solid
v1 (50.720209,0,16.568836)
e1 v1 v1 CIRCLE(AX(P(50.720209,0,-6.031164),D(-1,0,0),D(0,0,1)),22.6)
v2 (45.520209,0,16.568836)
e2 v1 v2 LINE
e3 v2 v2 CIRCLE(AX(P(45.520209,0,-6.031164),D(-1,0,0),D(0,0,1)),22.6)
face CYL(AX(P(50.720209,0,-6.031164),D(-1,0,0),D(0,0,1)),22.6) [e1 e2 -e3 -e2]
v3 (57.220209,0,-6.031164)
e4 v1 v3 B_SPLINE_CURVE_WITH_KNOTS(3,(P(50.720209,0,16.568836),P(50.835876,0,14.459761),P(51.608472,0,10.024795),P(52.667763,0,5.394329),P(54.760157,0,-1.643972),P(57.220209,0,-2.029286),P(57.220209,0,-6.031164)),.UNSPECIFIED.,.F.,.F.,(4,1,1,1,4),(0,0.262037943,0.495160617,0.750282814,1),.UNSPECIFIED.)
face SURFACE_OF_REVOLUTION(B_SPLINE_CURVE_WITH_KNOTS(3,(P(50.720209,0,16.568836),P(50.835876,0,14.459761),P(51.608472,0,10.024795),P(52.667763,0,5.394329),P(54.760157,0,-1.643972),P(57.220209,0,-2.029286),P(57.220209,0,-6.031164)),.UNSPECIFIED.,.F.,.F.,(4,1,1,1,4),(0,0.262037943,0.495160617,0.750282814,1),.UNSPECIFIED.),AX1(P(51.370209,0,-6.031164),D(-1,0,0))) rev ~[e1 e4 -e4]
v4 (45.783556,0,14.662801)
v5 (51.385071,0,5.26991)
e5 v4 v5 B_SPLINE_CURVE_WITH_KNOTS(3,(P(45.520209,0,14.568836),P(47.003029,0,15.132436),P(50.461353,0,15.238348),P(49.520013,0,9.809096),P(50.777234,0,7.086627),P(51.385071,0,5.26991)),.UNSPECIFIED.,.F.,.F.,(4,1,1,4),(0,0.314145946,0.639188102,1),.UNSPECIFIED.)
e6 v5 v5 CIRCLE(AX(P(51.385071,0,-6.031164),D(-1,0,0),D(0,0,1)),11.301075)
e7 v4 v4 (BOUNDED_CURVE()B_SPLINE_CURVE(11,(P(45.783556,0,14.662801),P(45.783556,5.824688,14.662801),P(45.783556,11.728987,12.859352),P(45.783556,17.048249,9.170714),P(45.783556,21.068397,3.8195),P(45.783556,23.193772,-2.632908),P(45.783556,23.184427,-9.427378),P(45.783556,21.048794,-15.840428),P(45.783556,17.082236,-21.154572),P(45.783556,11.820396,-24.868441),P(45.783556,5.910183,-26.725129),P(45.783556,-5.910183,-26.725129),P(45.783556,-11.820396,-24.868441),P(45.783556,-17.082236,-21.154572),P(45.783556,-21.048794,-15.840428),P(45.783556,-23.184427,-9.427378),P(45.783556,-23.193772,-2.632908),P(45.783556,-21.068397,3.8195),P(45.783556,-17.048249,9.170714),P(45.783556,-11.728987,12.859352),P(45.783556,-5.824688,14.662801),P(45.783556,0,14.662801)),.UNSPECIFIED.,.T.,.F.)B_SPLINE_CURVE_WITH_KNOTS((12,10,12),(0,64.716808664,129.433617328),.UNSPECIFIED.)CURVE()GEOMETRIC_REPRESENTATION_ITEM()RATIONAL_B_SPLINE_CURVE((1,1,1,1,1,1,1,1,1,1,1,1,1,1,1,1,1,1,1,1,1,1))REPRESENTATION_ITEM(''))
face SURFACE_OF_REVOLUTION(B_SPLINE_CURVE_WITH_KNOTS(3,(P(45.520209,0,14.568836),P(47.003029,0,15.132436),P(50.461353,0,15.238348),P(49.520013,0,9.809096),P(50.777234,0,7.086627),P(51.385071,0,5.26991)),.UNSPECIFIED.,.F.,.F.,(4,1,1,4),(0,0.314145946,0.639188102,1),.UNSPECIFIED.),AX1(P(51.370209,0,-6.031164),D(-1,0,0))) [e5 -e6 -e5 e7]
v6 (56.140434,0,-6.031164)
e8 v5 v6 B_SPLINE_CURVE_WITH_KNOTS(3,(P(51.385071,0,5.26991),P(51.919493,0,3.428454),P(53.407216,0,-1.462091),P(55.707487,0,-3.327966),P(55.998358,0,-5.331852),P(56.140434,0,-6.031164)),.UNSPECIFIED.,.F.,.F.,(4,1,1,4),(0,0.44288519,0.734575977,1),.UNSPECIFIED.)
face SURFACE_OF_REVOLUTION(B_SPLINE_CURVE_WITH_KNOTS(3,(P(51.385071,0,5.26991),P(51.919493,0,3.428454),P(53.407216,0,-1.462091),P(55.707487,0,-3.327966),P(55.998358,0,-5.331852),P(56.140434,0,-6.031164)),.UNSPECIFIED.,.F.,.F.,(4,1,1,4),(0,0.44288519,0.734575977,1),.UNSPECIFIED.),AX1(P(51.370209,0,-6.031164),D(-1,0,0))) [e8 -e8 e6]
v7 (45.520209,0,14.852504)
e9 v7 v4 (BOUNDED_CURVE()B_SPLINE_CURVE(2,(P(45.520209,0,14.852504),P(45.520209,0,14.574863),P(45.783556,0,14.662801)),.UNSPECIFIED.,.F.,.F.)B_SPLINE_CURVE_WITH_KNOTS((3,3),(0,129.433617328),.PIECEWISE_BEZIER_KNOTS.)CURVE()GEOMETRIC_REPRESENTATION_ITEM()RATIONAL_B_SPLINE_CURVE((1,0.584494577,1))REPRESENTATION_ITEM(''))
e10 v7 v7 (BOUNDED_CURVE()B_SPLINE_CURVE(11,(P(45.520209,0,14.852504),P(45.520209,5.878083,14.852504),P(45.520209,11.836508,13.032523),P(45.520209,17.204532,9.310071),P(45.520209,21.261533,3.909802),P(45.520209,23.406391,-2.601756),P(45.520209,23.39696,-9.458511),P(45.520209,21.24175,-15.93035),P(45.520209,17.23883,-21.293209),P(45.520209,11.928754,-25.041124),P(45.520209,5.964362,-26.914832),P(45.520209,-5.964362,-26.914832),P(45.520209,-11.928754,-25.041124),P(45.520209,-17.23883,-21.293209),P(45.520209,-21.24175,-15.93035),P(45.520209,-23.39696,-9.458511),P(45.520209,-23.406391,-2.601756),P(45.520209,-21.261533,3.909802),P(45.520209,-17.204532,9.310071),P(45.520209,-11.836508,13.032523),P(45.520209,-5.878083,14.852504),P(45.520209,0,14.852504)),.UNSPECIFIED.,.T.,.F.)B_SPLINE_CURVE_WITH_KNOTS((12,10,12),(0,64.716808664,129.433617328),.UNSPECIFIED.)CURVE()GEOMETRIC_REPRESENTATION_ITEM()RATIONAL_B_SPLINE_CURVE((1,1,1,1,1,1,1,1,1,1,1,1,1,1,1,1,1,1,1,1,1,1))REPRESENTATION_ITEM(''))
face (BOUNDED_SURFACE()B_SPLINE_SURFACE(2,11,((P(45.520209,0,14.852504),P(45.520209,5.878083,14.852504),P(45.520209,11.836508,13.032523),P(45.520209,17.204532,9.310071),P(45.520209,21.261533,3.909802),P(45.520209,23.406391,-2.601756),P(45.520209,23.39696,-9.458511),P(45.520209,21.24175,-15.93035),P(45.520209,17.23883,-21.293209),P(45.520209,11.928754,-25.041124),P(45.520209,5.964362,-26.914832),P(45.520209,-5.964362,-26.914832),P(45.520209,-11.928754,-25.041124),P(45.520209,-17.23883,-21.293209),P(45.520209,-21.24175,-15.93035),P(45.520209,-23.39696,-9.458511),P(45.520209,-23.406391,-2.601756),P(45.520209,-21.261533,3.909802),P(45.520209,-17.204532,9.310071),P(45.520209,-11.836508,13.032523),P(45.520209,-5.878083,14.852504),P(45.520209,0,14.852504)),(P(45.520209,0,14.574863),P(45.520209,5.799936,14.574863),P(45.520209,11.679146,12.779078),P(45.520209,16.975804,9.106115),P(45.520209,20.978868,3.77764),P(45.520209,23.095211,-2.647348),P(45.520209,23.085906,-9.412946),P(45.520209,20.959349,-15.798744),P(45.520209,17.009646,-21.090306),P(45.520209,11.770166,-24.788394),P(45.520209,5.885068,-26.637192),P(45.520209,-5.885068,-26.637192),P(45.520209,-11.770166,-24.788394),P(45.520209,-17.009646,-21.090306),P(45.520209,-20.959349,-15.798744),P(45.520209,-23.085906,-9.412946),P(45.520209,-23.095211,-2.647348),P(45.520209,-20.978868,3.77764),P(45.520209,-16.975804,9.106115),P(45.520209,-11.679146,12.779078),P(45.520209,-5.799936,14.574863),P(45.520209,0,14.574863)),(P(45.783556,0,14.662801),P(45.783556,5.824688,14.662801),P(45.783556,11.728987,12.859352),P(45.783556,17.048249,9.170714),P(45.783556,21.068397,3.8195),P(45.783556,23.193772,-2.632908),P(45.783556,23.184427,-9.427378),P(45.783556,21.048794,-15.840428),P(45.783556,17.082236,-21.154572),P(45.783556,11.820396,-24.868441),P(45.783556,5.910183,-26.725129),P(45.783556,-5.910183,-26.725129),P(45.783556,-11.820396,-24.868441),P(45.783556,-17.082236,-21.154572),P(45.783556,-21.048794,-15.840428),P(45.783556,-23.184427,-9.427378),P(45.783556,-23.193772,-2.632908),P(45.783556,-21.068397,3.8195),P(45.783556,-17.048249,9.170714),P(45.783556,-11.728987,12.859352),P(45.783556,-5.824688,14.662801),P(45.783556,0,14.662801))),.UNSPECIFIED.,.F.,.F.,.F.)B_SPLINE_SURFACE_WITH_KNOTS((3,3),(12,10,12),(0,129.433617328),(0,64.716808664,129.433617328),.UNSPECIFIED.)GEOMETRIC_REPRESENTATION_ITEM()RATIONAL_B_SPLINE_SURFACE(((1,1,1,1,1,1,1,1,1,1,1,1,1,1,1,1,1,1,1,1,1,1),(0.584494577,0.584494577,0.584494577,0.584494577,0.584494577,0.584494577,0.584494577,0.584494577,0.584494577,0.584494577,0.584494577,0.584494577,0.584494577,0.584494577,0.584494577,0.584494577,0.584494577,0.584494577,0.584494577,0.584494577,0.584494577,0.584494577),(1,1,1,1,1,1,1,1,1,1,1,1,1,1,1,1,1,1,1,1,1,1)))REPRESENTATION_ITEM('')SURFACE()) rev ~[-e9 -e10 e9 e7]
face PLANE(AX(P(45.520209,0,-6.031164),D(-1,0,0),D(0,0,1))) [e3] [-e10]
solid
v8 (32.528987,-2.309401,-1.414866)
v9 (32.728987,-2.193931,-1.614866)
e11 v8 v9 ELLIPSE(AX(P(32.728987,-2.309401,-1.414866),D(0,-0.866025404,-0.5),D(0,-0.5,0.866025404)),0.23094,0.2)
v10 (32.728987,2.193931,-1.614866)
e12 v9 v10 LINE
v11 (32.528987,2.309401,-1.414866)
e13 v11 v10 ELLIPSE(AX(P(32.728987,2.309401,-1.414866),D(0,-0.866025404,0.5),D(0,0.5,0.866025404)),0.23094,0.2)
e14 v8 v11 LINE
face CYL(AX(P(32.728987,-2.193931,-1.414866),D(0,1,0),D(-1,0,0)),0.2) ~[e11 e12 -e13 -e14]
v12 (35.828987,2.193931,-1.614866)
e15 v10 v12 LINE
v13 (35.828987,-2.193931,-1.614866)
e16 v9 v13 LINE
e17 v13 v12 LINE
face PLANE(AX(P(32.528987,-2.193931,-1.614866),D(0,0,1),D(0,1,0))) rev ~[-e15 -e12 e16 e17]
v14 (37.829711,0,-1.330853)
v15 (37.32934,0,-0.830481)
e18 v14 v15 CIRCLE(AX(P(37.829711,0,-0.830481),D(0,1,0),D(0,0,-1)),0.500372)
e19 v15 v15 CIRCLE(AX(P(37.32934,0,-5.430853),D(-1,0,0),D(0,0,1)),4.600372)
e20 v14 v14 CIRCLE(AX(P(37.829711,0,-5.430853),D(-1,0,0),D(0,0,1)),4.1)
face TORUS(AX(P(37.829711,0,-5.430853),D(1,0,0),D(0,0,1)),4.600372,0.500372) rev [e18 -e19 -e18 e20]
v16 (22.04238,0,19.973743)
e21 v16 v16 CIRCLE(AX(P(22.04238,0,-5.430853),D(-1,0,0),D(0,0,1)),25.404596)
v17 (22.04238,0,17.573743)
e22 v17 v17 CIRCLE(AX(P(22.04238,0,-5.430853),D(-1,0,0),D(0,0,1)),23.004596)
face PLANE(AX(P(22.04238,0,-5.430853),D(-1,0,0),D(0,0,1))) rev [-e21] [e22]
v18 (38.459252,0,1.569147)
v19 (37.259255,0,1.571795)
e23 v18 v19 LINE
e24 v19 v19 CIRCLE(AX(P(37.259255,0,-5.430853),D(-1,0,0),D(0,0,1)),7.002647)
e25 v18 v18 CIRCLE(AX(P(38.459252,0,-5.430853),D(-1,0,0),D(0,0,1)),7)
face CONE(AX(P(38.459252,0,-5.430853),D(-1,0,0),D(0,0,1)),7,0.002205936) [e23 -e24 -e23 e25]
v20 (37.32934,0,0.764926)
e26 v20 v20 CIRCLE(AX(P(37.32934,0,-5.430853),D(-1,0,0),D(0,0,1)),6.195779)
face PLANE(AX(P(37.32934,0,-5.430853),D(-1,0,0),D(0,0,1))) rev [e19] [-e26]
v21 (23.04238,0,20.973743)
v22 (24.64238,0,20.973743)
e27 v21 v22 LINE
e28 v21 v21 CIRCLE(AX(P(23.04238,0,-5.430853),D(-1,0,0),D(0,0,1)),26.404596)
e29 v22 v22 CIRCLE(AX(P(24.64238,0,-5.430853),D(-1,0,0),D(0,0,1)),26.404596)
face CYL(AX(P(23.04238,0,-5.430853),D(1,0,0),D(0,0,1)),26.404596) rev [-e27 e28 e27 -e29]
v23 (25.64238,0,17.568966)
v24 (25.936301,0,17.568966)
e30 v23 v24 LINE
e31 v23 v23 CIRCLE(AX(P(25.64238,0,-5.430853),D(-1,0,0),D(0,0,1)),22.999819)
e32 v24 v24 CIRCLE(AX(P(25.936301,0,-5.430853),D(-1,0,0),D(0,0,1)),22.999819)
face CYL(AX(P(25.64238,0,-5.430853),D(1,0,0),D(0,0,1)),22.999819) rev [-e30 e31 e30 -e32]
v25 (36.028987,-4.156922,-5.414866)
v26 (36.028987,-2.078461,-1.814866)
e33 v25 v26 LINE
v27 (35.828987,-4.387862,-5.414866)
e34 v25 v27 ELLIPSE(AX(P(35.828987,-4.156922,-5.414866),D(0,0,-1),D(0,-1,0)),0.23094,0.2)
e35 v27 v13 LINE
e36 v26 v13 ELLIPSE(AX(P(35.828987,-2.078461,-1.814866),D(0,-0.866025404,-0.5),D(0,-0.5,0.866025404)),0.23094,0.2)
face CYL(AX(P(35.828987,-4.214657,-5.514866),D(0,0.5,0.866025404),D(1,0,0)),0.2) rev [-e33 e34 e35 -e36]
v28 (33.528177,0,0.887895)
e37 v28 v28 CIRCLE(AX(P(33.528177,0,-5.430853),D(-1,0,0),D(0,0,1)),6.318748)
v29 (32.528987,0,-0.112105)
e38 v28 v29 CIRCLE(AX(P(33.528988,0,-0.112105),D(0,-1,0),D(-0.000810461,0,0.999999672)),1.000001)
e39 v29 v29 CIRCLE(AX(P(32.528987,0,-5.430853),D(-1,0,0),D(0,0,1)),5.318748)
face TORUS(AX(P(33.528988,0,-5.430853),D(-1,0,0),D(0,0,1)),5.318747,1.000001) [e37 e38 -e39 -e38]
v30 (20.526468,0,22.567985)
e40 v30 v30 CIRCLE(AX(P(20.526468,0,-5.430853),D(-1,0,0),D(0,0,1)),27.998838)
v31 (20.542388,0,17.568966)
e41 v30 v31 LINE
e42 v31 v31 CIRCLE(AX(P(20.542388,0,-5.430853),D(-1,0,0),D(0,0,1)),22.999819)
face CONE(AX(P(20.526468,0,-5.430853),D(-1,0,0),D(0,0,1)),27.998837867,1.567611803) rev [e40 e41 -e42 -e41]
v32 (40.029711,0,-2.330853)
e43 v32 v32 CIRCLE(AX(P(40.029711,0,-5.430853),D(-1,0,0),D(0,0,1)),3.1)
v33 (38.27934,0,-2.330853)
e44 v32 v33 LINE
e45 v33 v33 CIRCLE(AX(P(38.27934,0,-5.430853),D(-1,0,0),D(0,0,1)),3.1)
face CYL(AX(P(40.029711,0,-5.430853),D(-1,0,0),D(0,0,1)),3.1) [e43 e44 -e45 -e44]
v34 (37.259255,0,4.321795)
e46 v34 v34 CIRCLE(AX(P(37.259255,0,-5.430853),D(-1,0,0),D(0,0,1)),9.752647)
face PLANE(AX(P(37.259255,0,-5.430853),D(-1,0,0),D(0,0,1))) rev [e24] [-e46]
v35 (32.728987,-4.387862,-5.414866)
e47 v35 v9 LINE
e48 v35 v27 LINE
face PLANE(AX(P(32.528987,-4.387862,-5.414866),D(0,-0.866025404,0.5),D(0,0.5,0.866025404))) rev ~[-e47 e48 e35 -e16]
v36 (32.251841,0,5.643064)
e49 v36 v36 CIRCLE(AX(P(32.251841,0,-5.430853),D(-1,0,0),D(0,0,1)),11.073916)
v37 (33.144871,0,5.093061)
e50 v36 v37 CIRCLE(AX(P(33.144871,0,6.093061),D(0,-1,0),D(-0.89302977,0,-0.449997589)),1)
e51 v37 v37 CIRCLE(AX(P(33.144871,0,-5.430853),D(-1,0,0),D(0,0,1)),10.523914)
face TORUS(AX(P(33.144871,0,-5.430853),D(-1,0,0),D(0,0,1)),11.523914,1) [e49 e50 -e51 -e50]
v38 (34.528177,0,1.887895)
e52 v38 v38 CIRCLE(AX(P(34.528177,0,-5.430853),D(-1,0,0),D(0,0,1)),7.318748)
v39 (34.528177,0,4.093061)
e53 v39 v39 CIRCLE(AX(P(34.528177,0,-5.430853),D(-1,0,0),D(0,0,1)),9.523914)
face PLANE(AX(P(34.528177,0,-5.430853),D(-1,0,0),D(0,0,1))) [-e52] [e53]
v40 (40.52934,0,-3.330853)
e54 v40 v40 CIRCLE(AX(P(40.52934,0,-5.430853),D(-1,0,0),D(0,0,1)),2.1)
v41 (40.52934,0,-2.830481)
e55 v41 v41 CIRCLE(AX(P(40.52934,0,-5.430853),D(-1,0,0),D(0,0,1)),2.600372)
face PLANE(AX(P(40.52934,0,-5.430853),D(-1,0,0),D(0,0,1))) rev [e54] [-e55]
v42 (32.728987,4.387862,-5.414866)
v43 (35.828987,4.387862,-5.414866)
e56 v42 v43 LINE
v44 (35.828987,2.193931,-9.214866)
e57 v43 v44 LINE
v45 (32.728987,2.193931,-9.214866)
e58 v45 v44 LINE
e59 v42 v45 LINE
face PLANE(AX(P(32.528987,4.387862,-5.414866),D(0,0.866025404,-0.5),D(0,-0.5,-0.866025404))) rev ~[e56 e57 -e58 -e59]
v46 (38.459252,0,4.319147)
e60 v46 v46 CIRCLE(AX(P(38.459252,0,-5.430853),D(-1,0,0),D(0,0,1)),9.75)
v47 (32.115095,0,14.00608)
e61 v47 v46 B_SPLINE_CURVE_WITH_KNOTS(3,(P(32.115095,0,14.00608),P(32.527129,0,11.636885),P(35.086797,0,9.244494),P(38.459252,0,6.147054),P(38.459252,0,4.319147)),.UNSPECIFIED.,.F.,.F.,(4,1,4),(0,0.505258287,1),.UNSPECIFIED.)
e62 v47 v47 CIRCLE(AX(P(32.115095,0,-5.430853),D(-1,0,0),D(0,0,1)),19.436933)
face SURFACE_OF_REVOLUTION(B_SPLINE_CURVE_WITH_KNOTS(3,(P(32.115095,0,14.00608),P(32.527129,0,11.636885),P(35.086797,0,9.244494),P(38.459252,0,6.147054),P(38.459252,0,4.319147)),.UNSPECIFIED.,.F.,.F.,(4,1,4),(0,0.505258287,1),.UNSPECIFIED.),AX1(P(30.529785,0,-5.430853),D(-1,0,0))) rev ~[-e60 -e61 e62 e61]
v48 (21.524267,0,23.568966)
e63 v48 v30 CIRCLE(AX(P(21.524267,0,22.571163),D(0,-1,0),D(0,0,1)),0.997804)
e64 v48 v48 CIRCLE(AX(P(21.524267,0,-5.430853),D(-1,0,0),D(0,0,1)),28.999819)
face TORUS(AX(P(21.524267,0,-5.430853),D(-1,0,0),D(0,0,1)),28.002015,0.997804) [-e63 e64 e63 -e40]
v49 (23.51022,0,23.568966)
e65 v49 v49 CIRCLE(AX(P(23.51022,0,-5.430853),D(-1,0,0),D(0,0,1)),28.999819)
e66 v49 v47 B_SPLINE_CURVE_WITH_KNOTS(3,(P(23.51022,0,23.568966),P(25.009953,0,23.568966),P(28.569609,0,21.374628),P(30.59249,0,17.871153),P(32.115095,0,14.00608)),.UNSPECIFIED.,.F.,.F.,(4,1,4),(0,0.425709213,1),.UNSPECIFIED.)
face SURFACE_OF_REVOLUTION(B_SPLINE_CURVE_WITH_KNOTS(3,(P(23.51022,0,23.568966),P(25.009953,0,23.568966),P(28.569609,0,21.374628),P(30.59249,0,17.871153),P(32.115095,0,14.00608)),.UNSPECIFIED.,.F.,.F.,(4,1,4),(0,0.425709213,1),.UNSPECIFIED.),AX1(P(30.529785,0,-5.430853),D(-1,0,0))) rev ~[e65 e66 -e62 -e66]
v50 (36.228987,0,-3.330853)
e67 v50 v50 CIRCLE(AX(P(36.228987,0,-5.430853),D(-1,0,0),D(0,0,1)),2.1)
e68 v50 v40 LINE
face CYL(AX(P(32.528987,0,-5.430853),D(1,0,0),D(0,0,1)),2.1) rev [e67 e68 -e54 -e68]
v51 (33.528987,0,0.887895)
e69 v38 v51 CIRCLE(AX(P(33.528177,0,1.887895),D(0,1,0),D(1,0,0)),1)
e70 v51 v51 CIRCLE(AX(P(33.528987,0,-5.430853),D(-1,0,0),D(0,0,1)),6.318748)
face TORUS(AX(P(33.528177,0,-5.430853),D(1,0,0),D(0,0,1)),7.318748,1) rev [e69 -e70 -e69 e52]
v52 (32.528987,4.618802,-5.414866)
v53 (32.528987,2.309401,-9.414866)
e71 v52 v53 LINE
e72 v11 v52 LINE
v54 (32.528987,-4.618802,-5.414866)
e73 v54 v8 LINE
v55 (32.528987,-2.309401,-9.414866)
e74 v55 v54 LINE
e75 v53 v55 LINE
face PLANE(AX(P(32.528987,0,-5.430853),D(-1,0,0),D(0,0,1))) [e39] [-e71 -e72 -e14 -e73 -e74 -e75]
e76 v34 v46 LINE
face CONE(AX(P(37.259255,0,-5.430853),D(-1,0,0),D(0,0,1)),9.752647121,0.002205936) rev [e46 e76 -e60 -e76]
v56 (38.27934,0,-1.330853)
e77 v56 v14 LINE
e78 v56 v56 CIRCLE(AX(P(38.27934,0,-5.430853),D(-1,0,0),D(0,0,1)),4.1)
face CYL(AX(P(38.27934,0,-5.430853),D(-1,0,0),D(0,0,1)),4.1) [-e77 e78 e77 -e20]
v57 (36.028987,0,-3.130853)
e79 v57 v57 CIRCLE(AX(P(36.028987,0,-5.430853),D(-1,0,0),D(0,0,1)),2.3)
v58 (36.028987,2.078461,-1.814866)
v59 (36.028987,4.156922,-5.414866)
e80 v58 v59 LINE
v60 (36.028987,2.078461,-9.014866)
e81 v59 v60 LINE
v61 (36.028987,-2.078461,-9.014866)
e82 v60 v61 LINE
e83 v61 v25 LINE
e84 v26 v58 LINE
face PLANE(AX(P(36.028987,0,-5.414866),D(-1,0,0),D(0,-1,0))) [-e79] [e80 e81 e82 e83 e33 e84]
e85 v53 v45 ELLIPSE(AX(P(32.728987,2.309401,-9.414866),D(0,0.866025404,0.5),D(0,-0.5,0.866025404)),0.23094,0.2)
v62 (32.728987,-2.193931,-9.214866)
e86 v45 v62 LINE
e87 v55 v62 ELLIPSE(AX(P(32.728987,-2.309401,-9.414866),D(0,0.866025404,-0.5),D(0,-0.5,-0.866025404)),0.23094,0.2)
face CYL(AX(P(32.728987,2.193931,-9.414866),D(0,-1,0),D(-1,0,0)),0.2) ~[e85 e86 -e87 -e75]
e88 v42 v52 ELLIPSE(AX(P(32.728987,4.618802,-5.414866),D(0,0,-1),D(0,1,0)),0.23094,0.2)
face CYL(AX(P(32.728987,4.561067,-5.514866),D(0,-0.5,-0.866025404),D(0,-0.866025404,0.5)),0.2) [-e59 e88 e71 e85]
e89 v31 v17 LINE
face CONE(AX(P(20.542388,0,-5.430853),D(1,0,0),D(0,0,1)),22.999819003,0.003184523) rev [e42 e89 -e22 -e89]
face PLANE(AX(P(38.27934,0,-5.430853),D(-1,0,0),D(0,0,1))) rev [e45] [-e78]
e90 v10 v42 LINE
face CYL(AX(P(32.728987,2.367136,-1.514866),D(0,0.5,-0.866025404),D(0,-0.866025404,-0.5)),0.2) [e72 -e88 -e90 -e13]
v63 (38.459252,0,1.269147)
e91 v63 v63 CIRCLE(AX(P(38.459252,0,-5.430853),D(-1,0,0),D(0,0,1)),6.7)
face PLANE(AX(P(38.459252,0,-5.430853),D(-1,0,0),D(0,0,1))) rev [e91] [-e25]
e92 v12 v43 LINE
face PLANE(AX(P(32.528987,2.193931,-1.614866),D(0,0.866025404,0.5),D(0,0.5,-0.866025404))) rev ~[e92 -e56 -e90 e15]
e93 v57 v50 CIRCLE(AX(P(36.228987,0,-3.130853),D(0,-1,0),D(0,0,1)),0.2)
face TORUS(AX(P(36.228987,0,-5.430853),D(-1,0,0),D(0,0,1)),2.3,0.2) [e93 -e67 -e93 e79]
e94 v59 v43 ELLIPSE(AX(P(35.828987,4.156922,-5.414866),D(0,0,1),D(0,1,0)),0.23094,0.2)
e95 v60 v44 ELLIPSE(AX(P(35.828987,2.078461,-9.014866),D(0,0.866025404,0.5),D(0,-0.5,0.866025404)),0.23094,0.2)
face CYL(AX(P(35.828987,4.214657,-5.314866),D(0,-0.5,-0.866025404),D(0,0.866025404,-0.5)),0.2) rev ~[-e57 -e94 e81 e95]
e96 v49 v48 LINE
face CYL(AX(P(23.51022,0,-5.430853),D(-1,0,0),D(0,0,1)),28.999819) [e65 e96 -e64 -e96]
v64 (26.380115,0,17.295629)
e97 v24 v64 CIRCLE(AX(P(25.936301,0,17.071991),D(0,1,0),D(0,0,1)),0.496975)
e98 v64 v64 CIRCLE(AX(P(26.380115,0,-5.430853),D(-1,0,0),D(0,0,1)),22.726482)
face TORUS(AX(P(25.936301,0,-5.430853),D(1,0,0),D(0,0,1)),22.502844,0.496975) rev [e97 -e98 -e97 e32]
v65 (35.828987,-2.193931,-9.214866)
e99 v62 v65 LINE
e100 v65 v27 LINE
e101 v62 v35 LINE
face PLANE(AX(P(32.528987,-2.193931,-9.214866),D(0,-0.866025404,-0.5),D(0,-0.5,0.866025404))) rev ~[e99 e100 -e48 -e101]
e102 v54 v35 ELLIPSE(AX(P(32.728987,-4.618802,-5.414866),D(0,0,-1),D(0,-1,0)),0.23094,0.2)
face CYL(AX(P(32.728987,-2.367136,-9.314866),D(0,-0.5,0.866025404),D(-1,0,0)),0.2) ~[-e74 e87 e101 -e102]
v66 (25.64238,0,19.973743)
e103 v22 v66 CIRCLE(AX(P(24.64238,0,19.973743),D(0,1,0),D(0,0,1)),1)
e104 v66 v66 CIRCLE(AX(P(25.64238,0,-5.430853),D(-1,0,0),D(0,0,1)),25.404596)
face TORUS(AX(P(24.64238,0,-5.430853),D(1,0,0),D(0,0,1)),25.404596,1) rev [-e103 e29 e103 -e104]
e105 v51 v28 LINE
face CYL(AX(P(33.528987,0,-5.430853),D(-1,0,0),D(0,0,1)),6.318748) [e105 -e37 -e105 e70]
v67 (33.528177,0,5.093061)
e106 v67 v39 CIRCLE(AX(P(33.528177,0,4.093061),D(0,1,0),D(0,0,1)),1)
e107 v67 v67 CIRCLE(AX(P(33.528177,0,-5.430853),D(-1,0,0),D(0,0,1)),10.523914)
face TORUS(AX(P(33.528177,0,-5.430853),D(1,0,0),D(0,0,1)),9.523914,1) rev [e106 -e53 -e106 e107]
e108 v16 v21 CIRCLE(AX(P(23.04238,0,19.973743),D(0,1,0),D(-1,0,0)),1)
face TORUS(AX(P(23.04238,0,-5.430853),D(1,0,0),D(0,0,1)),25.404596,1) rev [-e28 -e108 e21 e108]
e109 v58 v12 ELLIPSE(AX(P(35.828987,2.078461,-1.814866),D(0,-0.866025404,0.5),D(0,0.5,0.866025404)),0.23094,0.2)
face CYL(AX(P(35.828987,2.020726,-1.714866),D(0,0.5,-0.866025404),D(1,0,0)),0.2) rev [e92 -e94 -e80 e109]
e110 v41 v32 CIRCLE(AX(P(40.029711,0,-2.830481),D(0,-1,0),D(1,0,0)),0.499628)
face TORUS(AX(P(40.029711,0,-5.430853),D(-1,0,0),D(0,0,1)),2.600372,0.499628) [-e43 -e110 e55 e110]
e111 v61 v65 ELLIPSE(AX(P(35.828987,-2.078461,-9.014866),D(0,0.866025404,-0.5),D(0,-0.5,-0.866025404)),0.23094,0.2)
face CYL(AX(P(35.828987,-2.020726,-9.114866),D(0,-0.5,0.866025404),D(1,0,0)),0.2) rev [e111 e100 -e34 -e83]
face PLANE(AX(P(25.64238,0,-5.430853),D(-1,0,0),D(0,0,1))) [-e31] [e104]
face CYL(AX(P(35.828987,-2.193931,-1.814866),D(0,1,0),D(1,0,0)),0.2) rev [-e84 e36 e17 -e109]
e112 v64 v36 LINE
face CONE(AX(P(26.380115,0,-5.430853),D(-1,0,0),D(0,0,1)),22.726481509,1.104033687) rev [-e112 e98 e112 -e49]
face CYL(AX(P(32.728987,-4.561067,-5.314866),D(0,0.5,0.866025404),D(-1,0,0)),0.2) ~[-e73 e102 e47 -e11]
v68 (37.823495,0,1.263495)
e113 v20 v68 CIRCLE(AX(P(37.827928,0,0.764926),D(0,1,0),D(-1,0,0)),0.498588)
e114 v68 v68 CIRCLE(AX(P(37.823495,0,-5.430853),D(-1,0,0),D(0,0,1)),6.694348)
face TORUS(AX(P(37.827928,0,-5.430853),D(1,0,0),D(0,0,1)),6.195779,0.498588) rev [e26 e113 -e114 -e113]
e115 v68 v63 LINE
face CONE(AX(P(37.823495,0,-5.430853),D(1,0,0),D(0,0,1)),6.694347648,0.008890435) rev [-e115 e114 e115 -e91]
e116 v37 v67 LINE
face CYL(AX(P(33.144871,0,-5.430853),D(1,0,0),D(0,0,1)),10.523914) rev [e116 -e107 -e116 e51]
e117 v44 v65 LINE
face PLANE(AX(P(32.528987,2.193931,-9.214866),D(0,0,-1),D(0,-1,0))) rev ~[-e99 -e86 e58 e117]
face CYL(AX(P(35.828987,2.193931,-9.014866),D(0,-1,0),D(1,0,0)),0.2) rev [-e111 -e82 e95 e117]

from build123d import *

# Parameters (mm, degrees)
F4_R     = 2.0999999528
F5_DEPTH = 3.5
F6_R     = 0.2
F7_R     = 0.2
F8_R     = 0.2


# Not quite as in the source:
# - ends of sketch curves that miss each other by under 0.0002 mm in the source are joined


with BuildPart() as f2:
    # F1 (on Front) → F2 (revolve)
    with BuildSketch(Plane.XZ):
        with BuildLine():
            Line((45.5202093899, 16.5688355967), (45.5202093899, 14.5688355967))
            add(Edge.make_bspline(
                [(45.5202093899, 14.5688355967), (47.0030293557, 15.1324356496), (50.4613529685, 15.2383481596), (49.5200126524, 9.8090960667), (50.7772336715, 7.0866265215), (51.3850711286, 5.2699102089)],
                knots=[0, 0, 0, 0, 0.3141459464, 0.6391881019, 1, 1, 1, 1], degree=3))
            add(Edge.make_bspline(
                [(51.3850711286, 5.2699102089), (51.9194927912, 3.4284537262), (53.407216137, -1.4620910675), (55.7074866053, -3.3279656709), (55.9983577552, -5.3318521758), (56.1404339969, -6.0311644033)],
                knots=[0, 0, 0, 0, 0.44288519, 0.7345759766, 1, 1, 1, 1], degree=3))
            Line((56.1404339969, -6.0311644033), (57.2202093899, -6.0311644033))
            add(Edge.make_bspline(
                [(50.7202093899, 16.5688355967), (50.8358756015, 14.4597607889), (51.6084715421, 10.0247948502), (52.6677632468, 5.3943286242), (54.7601573389, -1.6439715105), (57.2202093899, -2.029285999), (57.2202093899, -6.0311644033)],
                knots=[0, 0, 0, 0, 0.2620379435, 0.4951606169, 0.7502828141, 1, 1, 1, 1], degree=3))
            Line((50.7202093899, 16.5688355967), (45.5202093899, 16.5688355967))
        make_face()
    revolve(axis=Axis((51.3702093899, 0, -6.0311644033), (-1, 0, 0)))

    # F8
    f8_edges = [f2.edges().sort_by_distance(p)[0] for p in [
        (45.520209, 0, -26.631164),
    ]]
    fillet(f8_edges, radius=F8_R)


with BuildPart() as f3:
    # F0 (on Front) → F3 (revolve)
    with BuildSketch(Plane.XZ):
        with BuildLine():
            Line((36.0297112198, -3.3308526252), (40.5293395695, -3.3308526252))
            Line((40.5293395695, -3.3308526252), (40.5293395695, -2.8304809825))
            ThreePointArc((40.5293395695, -2.8304809825), (40.3830018139, -2.4771903884), (40.0297112198, -2.3308526328))
            Line((40.0297112198, -2.3308526328), (38.2793395695, -2.3308526328))
            Line((38.2793395695, -2.3308526328), (38.2793395695, -1.3308526328))
            Line((38.2793395695, -1.3308526328), (37.8297112198, -1.3308526328))
            ThreePointArc((37.8297112198, -1.3308526328), (37.4758950327, -1.1842971695), (37.3293395695, -0.8304809825))
            Line((37.3293395695, -0.8304809825), (37.3293395695, 0.7649264106))
            ThreePointArc((37.3293395695, 0.7649264106), (37.4738090239, 1.1159109608), (37.823495324, 1.2634950702))
            Line((37.823495324, 1.2634950702), (38.4592522457, 1.2691473748))
            Line((38.4592522457, 1.2691473748), (38.4592522457, 1.569147422))
            Line((38.4592522457, 1.569147422), (37.2592551654, 1.571794543))
            Line((37.2592551654, 1.571794543), (37.2592551654, 4.321794543))
            Line((37.2592551654, 4.321794543), (38.4592522457, 4.319147422))
            add(Edge.make_bspline(
                [(32.1150946415, 14.0060802641), (32.527128629, 11.6368848354), (35.086797429, 9.2444942472), (38.4592522457, 6.1470539947), (38.4592522457, 4.319147422)],
                knots=[0, 0, 0, 0, 0.5052582866, 1, 1, 1, 1], degree=3))
            add(Edge.make_bspline(
                [(23.510220087, 23.5689664246), (25.009952657, 23.5689664246), (28.5696091969, 21.3746279059), (30.5924900929, 17.8711530672), (32.1150946415, 14.0060802641)],
                knots=[0, 0, 0, 0, 0.4257092133, 1, 1, 1, 1], degree=3))
            Line((23.510220087, 23.5689664246), (21.5242667176, 23.5689664246))
            ThreePointArc((21.5242667176, 23.5689664246), (20.8175904861, 23.275592193), (20.5264681652, 22.5679852892))
            Line((20.5264681652, 22.5679852892), (20.5423877116, 17.5689664246))
            Line((20.5423877116, 17.5689664246), (22.0423801057, 17.5737432016))
            Line((22.0423801057, 17.5737432016), (22.0423801057, 19.9737432016))
            ThreePointArc((22.0423801057, 19.9737432016), (22.3352733245, 20.6808499828), (23.0423801057, 20.9737432016))
            Line((23.0423801057, 20.9737432016), (24.6423801057, 20.9737432016))
            ThreePointArc((24.6423801057, 20.9737432016), (25.3494868869, 20.6808499828), (25.6423801057, 19.9737432016))
            Line((25.6423801057, 19.9737432016), (25.6423801057, 17.5689664246))
            Line((25.6423801057, 17.5689664246), (25.9363012909, 17.5689664246))
            ThreePointArc((25.9363012909, 17.5689664246), (26.196917794, 17.4951500251), (26.3801148345, 17.2956289311))
            Line((26.3801148345, 17.2956289311), (32.2518409864, 5.6430637266))
            ThreePointArc((32.2518409864, 5.6430637266), (32.6204651827, 5.2415927055), (33.144870756, 5.093061316))
            Line((33.144870756, 5.093061316), (33.5281772316, 5.093061316))
            ThreePointArc((33.5281772316, 5.093061316), (34.2352840127, 4.8001680972), (34.5281772316, 4.093061316))
            Line((34.5281772316, 4.093061316), (34.5281772316, 1.8878950192))
            ThreePointArc((34.5281772316, 1.8878950192), (34.2355702979, 1.1810746391), (33.5289871321, 0.8878953472))
            Line((33.5289871321, 0.8878953472), (33.5281772316, 0.8878950192))
            ThreePointArc((33.5281772316, 0.8878950192), (32.8215940661, 0.5947153993), (32.5289871324, -0.1121049808))
            Line((32.5289871324, -0.1121049808), (32.5289871324, -0.585266359))
            Line((32.5289871324, -0.585266359), (32.5289871324, -0.785266359))
            Line((32.5289871324, -0.785266359), (32.5289871324, -3.3308526252))
            Line((32.5289871324, -3.3308526252), (36.0297112198, -3.3308526252))
        make_face()
    revolve(axis=Axis((30.5297849349, 0, -5.430852578), (-1, 0, 0)))

    # F4 (on face) → F5 (cut)
    with BuildSketch(Plane(origin=(32.5289871324, 0, 0), x_dir=(0, -1, 0), z_dir=(-1, 0, 0))):
        Polygon((-2.1939310229, -9.2148658602), (2.1939310229, -9.2148658602), (4.3878620458, -5.4148658602), (2.1939310229, -1.6148658602), (-2.1939310229, -1.6148658602), (-4.3878620458, -5.4148658602), align=None)
        with Locations((0, -5.430852578)):
            Circle(F4_R, mode=Mode.SUBTRACT)
    extrude(amount=-F5_DEPTH, mode=Mode.SUBTRACT)

    # F6
    f6_edges = [f3.edges().sort_by_distance(p)[0] for p in [
        (36.028987, 0, -9.214866),
        (36.028987, -3.290897, -7.314866),
        (36.028987, -3.290897, -3.514866),
        (36.028987, 0, -1.614866),
        (36.028987, 3.290897, -3.514866),
        (36.028987, 3.290897, -7.314866),
        (36.028987, 0, -7.530853),
    ]]
    fillet(f6_edges, radius=F6_R)

    # F7
    f7_edges = [f3.edges().sort_by_distance(p)[0] for p in [
        (32.528987, 0, -10.7496),
        (32.528987, 0, -9.214866),
        (32.528987, -3.290897, -7.314866),
        (32.528987, -3.290897, -3.514866),
        (32.528987, 0, -1.614866),
        (32.528987, 3.290897, -3.514866),
        (32.528987, 3.290897, -7.314866),
    ]]
    fillet(f7_edges, radius=F7_R)


solid = Compound([f2.part, f3.part])
